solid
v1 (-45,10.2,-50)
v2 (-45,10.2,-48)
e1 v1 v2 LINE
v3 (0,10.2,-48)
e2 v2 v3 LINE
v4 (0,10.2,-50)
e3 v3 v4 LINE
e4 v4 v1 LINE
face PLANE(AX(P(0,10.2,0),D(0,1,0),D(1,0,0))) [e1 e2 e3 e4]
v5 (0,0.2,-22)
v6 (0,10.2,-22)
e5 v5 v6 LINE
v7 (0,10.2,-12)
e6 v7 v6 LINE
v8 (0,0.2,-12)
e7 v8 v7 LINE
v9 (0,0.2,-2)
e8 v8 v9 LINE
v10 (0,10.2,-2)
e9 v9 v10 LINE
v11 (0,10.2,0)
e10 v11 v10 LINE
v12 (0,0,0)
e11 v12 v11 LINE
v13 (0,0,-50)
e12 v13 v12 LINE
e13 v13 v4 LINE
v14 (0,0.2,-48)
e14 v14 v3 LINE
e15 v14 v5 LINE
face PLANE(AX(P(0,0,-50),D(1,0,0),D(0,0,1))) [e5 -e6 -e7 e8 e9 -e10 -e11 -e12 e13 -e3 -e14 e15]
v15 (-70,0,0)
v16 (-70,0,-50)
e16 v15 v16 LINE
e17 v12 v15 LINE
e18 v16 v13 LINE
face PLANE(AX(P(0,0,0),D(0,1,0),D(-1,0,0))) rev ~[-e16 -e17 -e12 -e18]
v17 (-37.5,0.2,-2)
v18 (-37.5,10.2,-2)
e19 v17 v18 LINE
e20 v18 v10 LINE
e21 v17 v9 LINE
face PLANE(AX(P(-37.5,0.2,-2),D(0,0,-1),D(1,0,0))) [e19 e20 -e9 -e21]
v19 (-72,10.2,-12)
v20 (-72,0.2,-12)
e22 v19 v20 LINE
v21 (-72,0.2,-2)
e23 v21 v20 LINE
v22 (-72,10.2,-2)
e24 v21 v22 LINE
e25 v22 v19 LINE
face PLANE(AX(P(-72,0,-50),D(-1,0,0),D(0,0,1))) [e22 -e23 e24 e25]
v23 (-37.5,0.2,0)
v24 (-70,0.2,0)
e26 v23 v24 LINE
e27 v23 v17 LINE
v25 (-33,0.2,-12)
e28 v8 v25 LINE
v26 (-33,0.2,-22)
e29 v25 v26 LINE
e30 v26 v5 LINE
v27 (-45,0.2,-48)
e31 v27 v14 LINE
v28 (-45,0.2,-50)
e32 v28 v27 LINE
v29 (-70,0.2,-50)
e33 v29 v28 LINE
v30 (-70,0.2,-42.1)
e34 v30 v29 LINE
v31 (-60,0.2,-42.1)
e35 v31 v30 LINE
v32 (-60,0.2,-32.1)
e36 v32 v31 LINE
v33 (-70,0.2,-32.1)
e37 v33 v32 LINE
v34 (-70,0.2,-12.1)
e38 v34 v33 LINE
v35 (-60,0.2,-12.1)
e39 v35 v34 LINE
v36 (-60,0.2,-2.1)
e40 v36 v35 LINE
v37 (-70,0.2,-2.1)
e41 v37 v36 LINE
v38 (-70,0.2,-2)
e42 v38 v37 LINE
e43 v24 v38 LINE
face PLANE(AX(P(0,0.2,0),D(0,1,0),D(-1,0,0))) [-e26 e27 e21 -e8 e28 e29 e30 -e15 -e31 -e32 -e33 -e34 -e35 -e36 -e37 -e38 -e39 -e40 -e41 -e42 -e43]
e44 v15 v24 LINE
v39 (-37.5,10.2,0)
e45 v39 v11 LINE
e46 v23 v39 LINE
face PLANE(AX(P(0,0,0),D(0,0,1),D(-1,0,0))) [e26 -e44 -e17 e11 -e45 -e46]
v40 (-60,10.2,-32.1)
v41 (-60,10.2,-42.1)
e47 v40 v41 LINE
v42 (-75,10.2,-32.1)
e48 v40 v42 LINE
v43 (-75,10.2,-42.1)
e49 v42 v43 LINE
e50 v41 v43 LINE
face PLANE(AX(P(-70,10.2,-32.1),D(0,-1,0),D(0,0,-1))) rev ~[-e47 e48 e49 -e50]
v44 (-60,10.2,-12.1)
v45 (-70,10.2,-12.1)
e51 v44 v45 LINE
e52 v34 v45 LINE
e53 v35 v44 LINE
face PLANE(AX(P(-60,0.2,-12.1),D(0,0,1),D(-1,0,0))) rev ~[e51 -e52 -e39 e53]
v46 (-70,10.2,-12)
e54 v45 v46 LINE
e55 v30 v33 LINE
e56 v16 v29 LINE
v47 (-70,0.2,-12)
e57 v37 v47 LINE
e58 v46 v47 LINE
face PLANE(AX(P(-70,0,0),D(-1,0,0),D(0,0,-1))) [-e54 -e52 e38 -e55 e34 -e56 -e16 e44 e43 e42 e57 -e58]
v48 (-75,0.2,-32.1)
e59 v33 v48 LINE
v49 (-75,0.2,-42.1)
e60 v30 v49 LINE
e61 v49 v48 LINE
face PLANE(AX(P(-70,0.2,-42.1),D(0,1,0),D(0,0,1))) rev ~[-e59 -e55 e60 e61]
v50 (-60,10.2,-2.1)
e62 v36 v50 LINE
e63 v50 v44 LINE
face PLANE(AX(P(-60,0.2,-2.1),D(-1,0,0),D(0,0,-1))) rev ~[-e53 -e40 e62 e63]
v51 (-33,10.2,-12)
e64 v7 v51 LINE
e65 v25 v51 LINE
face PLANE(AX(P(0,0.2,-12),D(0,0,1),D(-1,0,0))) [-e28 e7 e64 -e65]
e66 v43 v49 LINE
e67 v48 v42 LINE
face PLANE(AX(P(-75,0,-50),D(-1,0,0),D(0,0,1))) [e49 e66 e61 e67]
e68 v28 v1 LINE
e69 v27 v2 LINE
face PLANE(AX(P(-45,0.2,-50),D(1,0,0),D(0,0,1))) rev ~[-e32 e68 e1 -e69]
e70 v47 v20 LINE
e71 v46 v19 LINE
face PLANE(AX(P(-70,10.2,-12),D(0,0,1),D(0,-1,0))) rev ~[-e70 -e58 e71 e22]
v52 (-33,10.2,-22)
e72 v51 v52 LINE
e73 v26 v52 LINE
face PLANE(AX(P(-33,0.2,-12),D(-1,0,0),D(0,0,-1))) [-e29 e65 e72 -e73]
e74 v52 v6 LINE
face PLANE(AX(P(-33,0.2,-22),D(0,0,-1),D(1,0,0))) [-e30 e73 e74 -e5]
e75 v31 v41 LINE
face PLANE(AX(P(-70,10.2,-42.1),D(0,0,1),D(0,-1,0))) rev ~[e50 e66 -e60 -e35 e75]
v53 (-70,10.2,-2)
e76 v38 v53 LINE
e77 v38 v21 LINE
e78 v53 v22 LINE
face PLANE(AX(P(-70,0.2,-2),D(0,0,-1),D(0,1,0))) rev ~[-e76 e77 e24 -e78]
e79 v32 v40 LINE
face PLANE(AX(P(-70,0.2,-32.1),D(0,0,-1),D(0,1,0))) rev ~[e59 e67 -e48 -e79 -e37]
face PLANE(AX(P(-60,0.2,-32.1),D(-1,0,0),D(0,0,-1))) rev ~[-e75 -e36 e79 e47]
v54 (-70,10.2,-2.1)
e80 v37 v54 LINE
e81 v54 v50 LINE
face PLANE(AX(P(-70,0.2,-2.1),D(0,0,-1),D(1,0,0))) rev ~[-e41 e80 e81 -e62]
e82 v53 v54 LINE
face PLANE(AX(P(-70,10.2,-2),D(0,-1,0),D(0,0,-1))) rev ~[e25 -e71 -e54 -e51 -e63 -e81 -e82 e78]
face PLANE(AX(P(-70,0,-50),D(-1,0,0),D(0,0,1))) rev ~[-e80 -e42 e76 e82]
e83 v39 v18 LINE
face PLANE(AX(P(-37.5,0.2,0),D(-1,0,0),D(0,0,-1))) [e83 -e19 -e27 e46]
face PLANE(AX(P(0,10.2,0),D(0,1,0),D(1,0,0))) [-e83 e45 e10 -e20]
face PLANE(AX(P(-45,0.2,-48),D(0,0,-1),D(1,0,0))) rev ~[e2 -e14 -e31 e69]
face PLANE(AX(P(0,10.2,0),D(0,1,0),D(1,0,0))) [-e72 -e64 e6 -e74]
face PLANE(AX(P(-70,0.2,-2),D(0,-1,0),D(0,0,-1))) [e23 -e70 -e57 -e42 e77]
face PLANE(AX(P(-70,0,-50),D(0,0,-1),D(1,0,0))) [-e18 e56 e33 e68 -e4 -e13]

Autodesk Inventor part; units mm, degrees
ref_plane "YZ Plane" through (0, 0, 0) normal (1, 0, 0) x (0, 1, 0)
ref_plane "XZ Plane" through (0, 0, 0) normal (0, 1, 0) x (-1, 0, 0)
ref_plane "XY Plane" through (0, 0, 0) normal (0, 0, 1) x (1, 0, 0)
sketch "Esboço3" plane through (0, 0, 0) normal (0, 1, 0) x (-1, 0, 0)
  line L0 (0, 0) -> (70, 0)
  line L1 (70, 0) -> (70, -50)
  line L2 (70, -50) -> (0, -50)
  line L3 (0, -50) -> (0, 0)
  dimension "d4" = 70
  dimension "d5" = 50
extrude "Extrusão2" add sketch "Esboço3" along normal blind 0.2
sketch "Esboço4" plane through (0, 0.2, 0) normal (0, 1, 0) x (1, 0, 0)
  line L0 (0, 0) -> (0, 50) projected
  line L1 (0, 50) -> (-45, 50)
  line L2 (-45, 50) -> (-45, 48)
  line L3 (-45, 48) -> (0, 48)
  line L4 (0, 48) -> (0, 50)
  line L5 (-70, 0) -> (0, 0) projected
  line L6 (0, 0) -> (-37.5, 0)
  line L7 (-37.5, 0) -> (-37.5, 2)
  line L8 (-37.5, 2) -> (0, 2)
  line L9 (0, 2) -> (0, 0)
  line L10 (0, 2) -> (0, 12)
  line L11 (0, 12) -> (-33, 12)
  line L12 (-33, 12) -> (-33, 22)
  line L13 (-33, 22) -> (0, 22)
  line L14 (0, 22) -> (0, 12)
  dimension "d8" = 45
  dimension "d9" = 2
  dimension "d10" = 37.5
  dimension "d11" = 2
  dimension "d12" = 10
  dimension "d13" = 33
  dimension "d14" = 10
extrude "Extrusão3" add sketch "Esboço4" along normal blind 10
sketch "Esboço5" plane through (0, 0.2, 0) normal (0, 1, 0) x (1, 0, 0)
  line L0 (-70, 0) -> (-70, 2.1)
  line L1 (-70, 50) -> (-70, 0) projected
  line L2 (-70, 2.1) -> (-60, 2.1)
  line L3 (-60, 2.1) -> (-60, 12.1)
  line L4 (-60, 12.1) -> (-72, 12.1)
  line L5 (-60, 2.1) -> (-72, 2.1)
  line L6 (-72, 2.1) -> (-72, 12.1)
  line L7 (-72, 12.1) -> (-60, 12.1)
  line L8 (-60, 12.1) -> (-60, 2.1)
  point P0 (0, 0)
  point P1 (-70, 12.1)
extrude "Extrusão4" add sketch "Esboço5" along normal blind 10 contours L4 L3 L2 L1
sketch "Esboço7" plane through (-70, 0, -50) normal (-1, 0, 0) x (0, 0, 1)
  line L0 (48, 0.2) -> (48, 10.2) projected
  line L1 (48, 0.2) -> (38, 0.2) projected
  line L2 (48, 10.2) -> (38, 10.2)
  line L3 (38, 10.2) -> (38, 0.2)
  line L4 (38, 0.2) -> (48, 0.2)
  line L5 (48, 0.2) -> (48, 10.2)
  point P0 (50, 0)
extrude "Extrusão5" add sketch "Esboço7" along normal blind 2
sketch "Esboço8" plane through (0, 0.2, 0) normal (0, 1, 0) x (1, 0, 0)
  line L0 (-60, 12.1) -> (-70, 12.1) projected
  line L1 (-70, 12.1) -> (-70, 32.1)
  line L2 (-70, 50) -> (-70, 12.1) projected
  line L3 (-70, 32.1) -> (-70, 39.6)
  line L4 (-70, 32.1) -> (-60, 32.1)
  line L5 (-60, 32.1) -> (-60, 42.1)
  line L6 (-60, 42.1) -> (-70, 42.1)
  line L7 (-70, 42.1) -> (-70, 32.1)
  point P0 (0, 0)
extrude "Extrusão6" add sketch "Esboço8" along normal blind 10
sketch "Esboço9" plane through (-70, 0, -50) normal (-1, 0, 0) x (0, 0, 1)
  line L0 (17.9, 10.2) -> (7.9, 10.2)
  line L1 (7.9, 10.2) -> (7.9, 0.2)
  line L2 (7.9, 0.2) -> (17.9, 0.2)
  line L3 (17.9, 0.2) -> (17.9, 10.2)
  point P0 (50, 0)
  dimension "d32" = 10
  dimension "d33" = 10
extrude "Extrusão7" add sketch "Esboço9" along normal blind 5
properties part number "arduinoUNO"
